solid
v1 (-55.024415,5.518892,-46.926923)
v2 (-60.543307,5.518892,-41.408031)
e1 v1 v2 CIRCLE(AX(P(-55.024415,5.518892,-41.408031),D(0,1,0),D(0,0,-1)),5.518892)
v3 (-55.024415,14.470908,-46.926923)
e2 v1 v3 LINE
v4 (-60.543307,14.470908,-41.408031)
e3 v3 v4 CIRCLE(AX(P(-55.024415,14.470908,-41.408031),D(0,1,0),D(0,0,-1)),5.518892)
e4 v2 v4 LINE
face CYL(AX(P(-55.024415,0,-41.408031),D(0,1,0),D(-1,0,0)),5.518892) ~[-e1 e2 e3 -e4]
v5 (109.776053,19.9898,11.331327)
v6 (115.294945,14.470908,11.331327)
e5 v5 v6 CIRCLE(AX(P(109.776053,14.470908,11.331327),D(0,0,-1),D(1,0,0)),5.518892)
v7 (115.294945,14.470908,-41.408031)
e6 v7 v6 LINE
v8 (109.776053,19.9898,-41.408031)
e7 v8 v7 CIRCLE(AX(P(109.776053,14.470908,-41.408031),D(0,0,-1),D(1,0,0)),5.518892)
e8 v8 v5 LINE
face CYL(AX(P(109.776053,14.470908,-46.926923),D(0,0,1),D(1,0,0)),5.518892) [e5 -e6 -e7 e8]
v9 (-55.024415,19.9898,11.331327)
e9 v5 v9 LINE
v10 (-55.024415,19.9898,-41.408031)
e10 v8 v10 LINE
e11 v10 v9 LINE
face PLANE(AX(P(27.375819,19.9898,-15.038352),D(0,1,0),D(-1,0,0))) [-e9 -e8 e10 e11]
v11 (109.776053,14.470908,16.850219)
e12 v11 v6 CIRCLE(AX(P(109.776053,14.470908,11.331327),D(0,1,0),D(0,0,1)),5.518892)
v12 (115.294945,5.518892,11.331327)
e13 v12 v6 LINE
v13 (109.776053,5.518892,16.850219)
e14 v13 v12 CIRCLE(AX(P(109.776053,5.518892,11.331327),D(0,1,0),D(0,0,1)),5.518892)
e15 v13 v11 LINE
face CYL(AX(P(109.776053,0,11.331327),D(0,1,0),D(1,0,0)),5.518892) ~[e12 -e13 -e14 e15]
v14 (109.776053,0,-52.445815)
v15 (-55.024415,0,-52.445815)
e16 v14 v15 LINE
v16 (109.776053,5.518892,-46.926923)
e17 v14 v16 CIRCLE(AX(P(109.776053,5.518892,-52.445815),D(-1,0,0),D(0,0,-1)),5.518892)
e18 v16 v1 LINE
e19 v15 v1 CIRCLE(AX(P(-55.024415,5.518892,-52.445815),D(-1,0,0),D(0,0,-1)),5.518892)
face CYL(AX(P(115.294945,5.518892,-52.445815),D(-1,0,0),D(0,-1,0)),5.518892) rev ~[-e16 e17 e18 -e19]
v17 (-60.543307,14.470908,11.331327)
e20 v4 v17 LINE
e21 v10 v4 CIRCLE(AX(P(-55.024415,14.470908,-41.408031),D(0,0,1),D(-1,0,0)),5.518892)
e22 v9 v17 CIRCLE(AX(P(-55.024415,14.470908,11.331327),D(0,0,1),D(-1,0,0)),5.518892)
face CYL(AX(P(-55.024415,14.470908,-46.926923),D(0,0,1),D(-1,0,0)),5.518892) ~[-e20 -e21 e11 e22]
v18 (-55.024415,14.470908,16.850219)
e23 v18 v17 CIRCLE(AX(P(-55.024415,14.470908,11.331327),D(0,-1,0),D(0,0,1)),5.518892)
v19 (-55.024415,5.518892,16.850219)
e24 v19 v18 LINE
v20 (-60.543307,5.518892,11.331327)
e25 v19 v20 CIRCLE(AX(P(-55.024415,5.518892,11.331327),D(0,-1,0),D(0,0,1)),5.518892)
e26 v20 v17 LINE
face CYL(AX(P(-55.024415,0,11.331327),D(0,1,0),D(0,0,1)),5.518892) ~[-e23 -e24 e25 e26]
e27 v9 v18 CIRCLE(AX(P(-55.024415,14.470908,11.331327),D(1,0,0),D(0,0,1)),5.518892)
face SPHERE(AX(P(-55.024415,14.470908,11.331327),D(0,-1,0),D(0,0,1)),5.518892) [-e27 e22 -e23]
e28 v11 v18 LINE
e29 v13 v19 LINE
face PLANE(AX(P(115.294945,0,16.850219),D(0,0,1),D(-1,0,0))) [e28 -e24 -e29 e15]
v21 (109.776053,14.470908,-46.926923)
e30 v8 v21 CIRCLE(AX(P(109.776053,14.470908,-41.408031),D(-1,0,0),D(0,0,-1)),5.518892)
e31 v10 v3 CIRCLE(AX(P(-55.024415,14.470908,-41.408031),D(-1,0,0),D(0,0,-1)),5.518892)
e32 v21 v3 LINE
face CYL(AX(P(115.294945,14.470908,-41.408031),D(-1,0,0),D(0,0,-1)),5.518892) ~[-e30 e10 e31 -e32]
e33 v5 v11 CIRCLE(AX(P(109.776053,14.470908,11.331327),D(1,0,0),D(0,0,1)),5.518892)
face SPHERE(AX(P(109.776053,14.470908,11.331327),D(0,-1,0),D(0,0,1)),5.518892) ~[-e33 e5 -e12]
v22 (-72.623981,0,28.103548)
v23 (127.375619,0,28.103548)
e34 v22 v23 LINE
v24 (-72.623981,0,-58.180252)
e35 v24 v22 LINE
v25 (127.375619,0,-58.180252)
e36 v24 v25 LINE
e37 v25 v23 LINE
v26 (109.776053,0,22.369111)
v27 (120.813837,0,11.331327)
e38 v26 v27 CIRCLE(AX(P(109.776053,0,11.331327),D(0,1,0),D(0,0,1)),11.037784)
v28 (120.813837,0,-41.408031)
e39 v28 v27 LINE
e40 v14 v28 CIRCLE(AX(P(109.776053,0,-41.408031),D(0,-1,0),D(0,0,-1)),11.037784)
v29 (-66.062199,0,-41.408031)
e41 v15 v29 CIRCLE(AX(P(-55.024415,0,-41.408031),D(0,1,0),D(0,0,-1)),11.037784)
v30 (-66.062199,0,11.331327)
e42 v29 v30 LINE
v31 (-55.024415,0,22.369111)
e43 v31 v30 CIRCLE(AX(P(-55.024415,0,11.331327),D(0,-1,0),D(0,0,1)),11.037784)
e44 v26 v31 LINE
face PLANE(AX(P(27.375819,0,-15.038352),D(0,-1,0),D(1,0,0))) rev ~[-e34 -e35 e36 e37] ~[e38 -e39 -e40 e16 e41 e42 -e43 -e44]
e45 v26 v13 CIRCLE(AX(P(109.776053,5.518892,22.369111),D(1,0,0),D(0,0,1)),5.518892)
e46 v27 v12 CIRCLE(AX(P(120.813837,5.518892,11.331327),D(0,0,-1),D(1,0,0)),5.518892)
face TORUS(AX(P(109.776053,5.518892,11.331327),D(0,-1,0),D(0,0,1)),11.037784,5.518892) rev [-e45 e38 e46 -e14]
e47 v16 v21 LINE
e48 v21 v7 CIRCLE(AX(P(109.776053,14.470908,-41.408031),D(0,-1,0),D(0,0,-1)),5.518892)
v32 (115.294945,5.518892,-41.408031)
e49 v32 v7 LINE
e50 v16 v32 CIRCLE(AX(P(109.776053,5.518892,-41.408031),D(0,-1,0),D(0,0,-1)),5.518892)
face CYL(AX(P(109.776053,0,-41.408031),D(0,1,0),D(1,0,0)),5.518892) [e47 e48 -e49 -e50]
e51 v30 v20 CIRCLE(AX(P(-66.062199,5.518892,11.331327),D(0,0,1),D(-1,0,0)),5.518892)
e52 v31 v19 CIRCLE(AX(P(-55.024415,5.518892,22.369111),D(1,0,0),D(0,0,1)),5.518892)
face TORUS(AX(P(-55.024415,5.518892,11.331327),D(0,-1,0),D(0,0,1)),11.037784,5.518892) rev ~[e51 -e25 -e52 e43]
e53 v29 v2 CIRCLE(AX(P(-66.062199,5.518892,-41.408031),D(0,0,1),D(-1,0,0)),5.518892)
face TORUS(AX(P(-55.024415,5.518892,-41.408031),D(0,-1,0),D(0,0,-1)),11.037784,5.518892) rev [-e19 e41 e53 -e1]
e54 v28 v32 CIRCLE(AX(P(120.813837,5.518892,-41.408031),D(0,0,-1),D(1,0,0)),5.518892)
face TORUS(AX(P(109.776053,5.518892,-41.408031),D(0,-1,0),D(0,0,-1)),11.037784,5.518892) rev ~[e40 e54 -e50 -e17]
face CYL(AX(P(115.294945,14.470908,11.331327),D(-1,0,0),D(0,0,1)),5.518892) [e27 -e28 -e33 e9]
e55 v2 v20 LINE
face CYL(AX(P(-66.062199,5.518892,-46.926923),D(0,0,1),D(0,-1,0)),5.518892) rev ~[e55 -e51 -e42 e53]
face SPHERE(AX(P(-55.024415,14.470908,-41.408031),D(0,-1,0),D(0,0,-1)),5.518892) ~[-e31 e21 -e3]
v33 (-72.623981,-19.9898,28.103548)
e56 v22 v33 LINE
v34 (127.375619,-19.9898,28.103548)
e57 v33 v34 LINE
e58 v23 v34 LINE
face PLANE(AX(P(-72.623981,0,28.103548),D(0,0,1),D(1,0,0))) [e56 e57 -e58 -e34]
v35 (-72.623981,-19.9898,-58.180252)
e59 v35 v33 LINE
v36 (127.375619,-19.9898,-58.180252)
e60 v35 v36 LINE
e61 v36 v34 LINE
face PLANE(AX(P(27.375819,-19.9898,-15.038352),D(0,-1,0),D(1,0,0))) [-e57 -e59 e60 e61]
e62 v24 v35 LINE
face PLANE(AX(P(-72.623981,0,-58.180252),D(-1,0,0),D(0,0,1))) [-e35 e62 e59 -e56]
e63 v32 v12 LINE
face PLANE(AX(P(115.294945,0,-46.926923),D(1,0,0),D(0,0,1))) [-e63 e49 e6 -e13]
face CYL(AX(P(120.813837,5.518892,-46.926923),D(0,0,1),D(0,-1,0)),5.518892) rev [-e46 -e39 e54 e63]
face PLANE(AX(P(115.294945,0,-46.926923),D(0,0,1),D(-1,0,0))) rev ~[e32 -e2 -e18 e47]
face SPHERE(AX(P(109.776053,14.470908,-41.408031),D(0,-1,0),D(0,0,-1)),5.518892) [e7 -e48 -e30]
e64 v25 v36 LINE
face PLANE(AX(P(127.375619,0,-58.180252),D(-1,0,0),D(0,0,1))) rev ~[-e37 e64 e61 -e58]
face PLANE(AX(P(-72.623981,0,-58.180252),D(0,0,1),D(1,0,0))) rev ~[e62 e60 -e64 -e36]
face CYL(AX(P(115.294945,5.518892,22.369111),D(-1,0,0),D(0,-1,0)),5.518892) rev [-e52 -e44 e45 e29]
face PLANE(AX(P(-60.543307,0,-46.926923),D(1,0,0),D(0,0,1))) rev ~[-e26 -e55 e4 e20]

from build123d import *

# Parameters (mm, degrees)
F0_W     = 199.9996
F0_H     = 86.2838
F1_DEPTH = 19.9898
F2_W     = 175.8382518563
F2_H     = 63.7771419656
F3_DEPTH = 19.9898
F4_R     = 5.5188922036


# Not quite as in the source:
# - the program builds the solid bodies; features that only make, move or delete a surface that nothing else refers to are left out


with BuildPart() as f1:
    # F0 (on Front) → F1 (new body)
    with BuildSketch(Plane.XZ):
        with Locations((27.3758191615, -15.038352045)):
            Rectangle(F0_W, F0_H)
    extrude(amount=F1_DEPTH)

    # F2 (on face) → F3 (join)
    with BuildSketch(Plane(origin=(0, 0, 0), x_dir=(-1, 0, 0), z_dir=(0, 1, 0))):
        with Locations((-27.3758191615, -15.038352045)):
            Rectangle(F2_W, F2_H)
    extrude(amount=F3_DEPTH)

    # F4
    f4_edges = [f1.edges().sort_by_distance(p)[0] for p in [
        (-60.543307, 9.9949, 16.850219),
        (115.294945, 9.9949, 16.850219),
        (27.375819, 0, 16.850219),
        (27.375819, 19.9898, 16.850219),
        (115.294945, 9.9949, -46.926923),
        (-60.543307, 9.9949, -46.926923),
        (27.375819, 0, -46.926923),
        (27.375819, 19.9898, -46.926923),
        (-60.543307, 0, -15.038352),
        (-60.543307, 19.9898, -15.038352),
        (115.294945, 0, -15.038352),
        (115.294945, 19.9898, -15.038352),
    ]]
    fillet(f4_edges, radius=F4_R)


solid = f1.part
